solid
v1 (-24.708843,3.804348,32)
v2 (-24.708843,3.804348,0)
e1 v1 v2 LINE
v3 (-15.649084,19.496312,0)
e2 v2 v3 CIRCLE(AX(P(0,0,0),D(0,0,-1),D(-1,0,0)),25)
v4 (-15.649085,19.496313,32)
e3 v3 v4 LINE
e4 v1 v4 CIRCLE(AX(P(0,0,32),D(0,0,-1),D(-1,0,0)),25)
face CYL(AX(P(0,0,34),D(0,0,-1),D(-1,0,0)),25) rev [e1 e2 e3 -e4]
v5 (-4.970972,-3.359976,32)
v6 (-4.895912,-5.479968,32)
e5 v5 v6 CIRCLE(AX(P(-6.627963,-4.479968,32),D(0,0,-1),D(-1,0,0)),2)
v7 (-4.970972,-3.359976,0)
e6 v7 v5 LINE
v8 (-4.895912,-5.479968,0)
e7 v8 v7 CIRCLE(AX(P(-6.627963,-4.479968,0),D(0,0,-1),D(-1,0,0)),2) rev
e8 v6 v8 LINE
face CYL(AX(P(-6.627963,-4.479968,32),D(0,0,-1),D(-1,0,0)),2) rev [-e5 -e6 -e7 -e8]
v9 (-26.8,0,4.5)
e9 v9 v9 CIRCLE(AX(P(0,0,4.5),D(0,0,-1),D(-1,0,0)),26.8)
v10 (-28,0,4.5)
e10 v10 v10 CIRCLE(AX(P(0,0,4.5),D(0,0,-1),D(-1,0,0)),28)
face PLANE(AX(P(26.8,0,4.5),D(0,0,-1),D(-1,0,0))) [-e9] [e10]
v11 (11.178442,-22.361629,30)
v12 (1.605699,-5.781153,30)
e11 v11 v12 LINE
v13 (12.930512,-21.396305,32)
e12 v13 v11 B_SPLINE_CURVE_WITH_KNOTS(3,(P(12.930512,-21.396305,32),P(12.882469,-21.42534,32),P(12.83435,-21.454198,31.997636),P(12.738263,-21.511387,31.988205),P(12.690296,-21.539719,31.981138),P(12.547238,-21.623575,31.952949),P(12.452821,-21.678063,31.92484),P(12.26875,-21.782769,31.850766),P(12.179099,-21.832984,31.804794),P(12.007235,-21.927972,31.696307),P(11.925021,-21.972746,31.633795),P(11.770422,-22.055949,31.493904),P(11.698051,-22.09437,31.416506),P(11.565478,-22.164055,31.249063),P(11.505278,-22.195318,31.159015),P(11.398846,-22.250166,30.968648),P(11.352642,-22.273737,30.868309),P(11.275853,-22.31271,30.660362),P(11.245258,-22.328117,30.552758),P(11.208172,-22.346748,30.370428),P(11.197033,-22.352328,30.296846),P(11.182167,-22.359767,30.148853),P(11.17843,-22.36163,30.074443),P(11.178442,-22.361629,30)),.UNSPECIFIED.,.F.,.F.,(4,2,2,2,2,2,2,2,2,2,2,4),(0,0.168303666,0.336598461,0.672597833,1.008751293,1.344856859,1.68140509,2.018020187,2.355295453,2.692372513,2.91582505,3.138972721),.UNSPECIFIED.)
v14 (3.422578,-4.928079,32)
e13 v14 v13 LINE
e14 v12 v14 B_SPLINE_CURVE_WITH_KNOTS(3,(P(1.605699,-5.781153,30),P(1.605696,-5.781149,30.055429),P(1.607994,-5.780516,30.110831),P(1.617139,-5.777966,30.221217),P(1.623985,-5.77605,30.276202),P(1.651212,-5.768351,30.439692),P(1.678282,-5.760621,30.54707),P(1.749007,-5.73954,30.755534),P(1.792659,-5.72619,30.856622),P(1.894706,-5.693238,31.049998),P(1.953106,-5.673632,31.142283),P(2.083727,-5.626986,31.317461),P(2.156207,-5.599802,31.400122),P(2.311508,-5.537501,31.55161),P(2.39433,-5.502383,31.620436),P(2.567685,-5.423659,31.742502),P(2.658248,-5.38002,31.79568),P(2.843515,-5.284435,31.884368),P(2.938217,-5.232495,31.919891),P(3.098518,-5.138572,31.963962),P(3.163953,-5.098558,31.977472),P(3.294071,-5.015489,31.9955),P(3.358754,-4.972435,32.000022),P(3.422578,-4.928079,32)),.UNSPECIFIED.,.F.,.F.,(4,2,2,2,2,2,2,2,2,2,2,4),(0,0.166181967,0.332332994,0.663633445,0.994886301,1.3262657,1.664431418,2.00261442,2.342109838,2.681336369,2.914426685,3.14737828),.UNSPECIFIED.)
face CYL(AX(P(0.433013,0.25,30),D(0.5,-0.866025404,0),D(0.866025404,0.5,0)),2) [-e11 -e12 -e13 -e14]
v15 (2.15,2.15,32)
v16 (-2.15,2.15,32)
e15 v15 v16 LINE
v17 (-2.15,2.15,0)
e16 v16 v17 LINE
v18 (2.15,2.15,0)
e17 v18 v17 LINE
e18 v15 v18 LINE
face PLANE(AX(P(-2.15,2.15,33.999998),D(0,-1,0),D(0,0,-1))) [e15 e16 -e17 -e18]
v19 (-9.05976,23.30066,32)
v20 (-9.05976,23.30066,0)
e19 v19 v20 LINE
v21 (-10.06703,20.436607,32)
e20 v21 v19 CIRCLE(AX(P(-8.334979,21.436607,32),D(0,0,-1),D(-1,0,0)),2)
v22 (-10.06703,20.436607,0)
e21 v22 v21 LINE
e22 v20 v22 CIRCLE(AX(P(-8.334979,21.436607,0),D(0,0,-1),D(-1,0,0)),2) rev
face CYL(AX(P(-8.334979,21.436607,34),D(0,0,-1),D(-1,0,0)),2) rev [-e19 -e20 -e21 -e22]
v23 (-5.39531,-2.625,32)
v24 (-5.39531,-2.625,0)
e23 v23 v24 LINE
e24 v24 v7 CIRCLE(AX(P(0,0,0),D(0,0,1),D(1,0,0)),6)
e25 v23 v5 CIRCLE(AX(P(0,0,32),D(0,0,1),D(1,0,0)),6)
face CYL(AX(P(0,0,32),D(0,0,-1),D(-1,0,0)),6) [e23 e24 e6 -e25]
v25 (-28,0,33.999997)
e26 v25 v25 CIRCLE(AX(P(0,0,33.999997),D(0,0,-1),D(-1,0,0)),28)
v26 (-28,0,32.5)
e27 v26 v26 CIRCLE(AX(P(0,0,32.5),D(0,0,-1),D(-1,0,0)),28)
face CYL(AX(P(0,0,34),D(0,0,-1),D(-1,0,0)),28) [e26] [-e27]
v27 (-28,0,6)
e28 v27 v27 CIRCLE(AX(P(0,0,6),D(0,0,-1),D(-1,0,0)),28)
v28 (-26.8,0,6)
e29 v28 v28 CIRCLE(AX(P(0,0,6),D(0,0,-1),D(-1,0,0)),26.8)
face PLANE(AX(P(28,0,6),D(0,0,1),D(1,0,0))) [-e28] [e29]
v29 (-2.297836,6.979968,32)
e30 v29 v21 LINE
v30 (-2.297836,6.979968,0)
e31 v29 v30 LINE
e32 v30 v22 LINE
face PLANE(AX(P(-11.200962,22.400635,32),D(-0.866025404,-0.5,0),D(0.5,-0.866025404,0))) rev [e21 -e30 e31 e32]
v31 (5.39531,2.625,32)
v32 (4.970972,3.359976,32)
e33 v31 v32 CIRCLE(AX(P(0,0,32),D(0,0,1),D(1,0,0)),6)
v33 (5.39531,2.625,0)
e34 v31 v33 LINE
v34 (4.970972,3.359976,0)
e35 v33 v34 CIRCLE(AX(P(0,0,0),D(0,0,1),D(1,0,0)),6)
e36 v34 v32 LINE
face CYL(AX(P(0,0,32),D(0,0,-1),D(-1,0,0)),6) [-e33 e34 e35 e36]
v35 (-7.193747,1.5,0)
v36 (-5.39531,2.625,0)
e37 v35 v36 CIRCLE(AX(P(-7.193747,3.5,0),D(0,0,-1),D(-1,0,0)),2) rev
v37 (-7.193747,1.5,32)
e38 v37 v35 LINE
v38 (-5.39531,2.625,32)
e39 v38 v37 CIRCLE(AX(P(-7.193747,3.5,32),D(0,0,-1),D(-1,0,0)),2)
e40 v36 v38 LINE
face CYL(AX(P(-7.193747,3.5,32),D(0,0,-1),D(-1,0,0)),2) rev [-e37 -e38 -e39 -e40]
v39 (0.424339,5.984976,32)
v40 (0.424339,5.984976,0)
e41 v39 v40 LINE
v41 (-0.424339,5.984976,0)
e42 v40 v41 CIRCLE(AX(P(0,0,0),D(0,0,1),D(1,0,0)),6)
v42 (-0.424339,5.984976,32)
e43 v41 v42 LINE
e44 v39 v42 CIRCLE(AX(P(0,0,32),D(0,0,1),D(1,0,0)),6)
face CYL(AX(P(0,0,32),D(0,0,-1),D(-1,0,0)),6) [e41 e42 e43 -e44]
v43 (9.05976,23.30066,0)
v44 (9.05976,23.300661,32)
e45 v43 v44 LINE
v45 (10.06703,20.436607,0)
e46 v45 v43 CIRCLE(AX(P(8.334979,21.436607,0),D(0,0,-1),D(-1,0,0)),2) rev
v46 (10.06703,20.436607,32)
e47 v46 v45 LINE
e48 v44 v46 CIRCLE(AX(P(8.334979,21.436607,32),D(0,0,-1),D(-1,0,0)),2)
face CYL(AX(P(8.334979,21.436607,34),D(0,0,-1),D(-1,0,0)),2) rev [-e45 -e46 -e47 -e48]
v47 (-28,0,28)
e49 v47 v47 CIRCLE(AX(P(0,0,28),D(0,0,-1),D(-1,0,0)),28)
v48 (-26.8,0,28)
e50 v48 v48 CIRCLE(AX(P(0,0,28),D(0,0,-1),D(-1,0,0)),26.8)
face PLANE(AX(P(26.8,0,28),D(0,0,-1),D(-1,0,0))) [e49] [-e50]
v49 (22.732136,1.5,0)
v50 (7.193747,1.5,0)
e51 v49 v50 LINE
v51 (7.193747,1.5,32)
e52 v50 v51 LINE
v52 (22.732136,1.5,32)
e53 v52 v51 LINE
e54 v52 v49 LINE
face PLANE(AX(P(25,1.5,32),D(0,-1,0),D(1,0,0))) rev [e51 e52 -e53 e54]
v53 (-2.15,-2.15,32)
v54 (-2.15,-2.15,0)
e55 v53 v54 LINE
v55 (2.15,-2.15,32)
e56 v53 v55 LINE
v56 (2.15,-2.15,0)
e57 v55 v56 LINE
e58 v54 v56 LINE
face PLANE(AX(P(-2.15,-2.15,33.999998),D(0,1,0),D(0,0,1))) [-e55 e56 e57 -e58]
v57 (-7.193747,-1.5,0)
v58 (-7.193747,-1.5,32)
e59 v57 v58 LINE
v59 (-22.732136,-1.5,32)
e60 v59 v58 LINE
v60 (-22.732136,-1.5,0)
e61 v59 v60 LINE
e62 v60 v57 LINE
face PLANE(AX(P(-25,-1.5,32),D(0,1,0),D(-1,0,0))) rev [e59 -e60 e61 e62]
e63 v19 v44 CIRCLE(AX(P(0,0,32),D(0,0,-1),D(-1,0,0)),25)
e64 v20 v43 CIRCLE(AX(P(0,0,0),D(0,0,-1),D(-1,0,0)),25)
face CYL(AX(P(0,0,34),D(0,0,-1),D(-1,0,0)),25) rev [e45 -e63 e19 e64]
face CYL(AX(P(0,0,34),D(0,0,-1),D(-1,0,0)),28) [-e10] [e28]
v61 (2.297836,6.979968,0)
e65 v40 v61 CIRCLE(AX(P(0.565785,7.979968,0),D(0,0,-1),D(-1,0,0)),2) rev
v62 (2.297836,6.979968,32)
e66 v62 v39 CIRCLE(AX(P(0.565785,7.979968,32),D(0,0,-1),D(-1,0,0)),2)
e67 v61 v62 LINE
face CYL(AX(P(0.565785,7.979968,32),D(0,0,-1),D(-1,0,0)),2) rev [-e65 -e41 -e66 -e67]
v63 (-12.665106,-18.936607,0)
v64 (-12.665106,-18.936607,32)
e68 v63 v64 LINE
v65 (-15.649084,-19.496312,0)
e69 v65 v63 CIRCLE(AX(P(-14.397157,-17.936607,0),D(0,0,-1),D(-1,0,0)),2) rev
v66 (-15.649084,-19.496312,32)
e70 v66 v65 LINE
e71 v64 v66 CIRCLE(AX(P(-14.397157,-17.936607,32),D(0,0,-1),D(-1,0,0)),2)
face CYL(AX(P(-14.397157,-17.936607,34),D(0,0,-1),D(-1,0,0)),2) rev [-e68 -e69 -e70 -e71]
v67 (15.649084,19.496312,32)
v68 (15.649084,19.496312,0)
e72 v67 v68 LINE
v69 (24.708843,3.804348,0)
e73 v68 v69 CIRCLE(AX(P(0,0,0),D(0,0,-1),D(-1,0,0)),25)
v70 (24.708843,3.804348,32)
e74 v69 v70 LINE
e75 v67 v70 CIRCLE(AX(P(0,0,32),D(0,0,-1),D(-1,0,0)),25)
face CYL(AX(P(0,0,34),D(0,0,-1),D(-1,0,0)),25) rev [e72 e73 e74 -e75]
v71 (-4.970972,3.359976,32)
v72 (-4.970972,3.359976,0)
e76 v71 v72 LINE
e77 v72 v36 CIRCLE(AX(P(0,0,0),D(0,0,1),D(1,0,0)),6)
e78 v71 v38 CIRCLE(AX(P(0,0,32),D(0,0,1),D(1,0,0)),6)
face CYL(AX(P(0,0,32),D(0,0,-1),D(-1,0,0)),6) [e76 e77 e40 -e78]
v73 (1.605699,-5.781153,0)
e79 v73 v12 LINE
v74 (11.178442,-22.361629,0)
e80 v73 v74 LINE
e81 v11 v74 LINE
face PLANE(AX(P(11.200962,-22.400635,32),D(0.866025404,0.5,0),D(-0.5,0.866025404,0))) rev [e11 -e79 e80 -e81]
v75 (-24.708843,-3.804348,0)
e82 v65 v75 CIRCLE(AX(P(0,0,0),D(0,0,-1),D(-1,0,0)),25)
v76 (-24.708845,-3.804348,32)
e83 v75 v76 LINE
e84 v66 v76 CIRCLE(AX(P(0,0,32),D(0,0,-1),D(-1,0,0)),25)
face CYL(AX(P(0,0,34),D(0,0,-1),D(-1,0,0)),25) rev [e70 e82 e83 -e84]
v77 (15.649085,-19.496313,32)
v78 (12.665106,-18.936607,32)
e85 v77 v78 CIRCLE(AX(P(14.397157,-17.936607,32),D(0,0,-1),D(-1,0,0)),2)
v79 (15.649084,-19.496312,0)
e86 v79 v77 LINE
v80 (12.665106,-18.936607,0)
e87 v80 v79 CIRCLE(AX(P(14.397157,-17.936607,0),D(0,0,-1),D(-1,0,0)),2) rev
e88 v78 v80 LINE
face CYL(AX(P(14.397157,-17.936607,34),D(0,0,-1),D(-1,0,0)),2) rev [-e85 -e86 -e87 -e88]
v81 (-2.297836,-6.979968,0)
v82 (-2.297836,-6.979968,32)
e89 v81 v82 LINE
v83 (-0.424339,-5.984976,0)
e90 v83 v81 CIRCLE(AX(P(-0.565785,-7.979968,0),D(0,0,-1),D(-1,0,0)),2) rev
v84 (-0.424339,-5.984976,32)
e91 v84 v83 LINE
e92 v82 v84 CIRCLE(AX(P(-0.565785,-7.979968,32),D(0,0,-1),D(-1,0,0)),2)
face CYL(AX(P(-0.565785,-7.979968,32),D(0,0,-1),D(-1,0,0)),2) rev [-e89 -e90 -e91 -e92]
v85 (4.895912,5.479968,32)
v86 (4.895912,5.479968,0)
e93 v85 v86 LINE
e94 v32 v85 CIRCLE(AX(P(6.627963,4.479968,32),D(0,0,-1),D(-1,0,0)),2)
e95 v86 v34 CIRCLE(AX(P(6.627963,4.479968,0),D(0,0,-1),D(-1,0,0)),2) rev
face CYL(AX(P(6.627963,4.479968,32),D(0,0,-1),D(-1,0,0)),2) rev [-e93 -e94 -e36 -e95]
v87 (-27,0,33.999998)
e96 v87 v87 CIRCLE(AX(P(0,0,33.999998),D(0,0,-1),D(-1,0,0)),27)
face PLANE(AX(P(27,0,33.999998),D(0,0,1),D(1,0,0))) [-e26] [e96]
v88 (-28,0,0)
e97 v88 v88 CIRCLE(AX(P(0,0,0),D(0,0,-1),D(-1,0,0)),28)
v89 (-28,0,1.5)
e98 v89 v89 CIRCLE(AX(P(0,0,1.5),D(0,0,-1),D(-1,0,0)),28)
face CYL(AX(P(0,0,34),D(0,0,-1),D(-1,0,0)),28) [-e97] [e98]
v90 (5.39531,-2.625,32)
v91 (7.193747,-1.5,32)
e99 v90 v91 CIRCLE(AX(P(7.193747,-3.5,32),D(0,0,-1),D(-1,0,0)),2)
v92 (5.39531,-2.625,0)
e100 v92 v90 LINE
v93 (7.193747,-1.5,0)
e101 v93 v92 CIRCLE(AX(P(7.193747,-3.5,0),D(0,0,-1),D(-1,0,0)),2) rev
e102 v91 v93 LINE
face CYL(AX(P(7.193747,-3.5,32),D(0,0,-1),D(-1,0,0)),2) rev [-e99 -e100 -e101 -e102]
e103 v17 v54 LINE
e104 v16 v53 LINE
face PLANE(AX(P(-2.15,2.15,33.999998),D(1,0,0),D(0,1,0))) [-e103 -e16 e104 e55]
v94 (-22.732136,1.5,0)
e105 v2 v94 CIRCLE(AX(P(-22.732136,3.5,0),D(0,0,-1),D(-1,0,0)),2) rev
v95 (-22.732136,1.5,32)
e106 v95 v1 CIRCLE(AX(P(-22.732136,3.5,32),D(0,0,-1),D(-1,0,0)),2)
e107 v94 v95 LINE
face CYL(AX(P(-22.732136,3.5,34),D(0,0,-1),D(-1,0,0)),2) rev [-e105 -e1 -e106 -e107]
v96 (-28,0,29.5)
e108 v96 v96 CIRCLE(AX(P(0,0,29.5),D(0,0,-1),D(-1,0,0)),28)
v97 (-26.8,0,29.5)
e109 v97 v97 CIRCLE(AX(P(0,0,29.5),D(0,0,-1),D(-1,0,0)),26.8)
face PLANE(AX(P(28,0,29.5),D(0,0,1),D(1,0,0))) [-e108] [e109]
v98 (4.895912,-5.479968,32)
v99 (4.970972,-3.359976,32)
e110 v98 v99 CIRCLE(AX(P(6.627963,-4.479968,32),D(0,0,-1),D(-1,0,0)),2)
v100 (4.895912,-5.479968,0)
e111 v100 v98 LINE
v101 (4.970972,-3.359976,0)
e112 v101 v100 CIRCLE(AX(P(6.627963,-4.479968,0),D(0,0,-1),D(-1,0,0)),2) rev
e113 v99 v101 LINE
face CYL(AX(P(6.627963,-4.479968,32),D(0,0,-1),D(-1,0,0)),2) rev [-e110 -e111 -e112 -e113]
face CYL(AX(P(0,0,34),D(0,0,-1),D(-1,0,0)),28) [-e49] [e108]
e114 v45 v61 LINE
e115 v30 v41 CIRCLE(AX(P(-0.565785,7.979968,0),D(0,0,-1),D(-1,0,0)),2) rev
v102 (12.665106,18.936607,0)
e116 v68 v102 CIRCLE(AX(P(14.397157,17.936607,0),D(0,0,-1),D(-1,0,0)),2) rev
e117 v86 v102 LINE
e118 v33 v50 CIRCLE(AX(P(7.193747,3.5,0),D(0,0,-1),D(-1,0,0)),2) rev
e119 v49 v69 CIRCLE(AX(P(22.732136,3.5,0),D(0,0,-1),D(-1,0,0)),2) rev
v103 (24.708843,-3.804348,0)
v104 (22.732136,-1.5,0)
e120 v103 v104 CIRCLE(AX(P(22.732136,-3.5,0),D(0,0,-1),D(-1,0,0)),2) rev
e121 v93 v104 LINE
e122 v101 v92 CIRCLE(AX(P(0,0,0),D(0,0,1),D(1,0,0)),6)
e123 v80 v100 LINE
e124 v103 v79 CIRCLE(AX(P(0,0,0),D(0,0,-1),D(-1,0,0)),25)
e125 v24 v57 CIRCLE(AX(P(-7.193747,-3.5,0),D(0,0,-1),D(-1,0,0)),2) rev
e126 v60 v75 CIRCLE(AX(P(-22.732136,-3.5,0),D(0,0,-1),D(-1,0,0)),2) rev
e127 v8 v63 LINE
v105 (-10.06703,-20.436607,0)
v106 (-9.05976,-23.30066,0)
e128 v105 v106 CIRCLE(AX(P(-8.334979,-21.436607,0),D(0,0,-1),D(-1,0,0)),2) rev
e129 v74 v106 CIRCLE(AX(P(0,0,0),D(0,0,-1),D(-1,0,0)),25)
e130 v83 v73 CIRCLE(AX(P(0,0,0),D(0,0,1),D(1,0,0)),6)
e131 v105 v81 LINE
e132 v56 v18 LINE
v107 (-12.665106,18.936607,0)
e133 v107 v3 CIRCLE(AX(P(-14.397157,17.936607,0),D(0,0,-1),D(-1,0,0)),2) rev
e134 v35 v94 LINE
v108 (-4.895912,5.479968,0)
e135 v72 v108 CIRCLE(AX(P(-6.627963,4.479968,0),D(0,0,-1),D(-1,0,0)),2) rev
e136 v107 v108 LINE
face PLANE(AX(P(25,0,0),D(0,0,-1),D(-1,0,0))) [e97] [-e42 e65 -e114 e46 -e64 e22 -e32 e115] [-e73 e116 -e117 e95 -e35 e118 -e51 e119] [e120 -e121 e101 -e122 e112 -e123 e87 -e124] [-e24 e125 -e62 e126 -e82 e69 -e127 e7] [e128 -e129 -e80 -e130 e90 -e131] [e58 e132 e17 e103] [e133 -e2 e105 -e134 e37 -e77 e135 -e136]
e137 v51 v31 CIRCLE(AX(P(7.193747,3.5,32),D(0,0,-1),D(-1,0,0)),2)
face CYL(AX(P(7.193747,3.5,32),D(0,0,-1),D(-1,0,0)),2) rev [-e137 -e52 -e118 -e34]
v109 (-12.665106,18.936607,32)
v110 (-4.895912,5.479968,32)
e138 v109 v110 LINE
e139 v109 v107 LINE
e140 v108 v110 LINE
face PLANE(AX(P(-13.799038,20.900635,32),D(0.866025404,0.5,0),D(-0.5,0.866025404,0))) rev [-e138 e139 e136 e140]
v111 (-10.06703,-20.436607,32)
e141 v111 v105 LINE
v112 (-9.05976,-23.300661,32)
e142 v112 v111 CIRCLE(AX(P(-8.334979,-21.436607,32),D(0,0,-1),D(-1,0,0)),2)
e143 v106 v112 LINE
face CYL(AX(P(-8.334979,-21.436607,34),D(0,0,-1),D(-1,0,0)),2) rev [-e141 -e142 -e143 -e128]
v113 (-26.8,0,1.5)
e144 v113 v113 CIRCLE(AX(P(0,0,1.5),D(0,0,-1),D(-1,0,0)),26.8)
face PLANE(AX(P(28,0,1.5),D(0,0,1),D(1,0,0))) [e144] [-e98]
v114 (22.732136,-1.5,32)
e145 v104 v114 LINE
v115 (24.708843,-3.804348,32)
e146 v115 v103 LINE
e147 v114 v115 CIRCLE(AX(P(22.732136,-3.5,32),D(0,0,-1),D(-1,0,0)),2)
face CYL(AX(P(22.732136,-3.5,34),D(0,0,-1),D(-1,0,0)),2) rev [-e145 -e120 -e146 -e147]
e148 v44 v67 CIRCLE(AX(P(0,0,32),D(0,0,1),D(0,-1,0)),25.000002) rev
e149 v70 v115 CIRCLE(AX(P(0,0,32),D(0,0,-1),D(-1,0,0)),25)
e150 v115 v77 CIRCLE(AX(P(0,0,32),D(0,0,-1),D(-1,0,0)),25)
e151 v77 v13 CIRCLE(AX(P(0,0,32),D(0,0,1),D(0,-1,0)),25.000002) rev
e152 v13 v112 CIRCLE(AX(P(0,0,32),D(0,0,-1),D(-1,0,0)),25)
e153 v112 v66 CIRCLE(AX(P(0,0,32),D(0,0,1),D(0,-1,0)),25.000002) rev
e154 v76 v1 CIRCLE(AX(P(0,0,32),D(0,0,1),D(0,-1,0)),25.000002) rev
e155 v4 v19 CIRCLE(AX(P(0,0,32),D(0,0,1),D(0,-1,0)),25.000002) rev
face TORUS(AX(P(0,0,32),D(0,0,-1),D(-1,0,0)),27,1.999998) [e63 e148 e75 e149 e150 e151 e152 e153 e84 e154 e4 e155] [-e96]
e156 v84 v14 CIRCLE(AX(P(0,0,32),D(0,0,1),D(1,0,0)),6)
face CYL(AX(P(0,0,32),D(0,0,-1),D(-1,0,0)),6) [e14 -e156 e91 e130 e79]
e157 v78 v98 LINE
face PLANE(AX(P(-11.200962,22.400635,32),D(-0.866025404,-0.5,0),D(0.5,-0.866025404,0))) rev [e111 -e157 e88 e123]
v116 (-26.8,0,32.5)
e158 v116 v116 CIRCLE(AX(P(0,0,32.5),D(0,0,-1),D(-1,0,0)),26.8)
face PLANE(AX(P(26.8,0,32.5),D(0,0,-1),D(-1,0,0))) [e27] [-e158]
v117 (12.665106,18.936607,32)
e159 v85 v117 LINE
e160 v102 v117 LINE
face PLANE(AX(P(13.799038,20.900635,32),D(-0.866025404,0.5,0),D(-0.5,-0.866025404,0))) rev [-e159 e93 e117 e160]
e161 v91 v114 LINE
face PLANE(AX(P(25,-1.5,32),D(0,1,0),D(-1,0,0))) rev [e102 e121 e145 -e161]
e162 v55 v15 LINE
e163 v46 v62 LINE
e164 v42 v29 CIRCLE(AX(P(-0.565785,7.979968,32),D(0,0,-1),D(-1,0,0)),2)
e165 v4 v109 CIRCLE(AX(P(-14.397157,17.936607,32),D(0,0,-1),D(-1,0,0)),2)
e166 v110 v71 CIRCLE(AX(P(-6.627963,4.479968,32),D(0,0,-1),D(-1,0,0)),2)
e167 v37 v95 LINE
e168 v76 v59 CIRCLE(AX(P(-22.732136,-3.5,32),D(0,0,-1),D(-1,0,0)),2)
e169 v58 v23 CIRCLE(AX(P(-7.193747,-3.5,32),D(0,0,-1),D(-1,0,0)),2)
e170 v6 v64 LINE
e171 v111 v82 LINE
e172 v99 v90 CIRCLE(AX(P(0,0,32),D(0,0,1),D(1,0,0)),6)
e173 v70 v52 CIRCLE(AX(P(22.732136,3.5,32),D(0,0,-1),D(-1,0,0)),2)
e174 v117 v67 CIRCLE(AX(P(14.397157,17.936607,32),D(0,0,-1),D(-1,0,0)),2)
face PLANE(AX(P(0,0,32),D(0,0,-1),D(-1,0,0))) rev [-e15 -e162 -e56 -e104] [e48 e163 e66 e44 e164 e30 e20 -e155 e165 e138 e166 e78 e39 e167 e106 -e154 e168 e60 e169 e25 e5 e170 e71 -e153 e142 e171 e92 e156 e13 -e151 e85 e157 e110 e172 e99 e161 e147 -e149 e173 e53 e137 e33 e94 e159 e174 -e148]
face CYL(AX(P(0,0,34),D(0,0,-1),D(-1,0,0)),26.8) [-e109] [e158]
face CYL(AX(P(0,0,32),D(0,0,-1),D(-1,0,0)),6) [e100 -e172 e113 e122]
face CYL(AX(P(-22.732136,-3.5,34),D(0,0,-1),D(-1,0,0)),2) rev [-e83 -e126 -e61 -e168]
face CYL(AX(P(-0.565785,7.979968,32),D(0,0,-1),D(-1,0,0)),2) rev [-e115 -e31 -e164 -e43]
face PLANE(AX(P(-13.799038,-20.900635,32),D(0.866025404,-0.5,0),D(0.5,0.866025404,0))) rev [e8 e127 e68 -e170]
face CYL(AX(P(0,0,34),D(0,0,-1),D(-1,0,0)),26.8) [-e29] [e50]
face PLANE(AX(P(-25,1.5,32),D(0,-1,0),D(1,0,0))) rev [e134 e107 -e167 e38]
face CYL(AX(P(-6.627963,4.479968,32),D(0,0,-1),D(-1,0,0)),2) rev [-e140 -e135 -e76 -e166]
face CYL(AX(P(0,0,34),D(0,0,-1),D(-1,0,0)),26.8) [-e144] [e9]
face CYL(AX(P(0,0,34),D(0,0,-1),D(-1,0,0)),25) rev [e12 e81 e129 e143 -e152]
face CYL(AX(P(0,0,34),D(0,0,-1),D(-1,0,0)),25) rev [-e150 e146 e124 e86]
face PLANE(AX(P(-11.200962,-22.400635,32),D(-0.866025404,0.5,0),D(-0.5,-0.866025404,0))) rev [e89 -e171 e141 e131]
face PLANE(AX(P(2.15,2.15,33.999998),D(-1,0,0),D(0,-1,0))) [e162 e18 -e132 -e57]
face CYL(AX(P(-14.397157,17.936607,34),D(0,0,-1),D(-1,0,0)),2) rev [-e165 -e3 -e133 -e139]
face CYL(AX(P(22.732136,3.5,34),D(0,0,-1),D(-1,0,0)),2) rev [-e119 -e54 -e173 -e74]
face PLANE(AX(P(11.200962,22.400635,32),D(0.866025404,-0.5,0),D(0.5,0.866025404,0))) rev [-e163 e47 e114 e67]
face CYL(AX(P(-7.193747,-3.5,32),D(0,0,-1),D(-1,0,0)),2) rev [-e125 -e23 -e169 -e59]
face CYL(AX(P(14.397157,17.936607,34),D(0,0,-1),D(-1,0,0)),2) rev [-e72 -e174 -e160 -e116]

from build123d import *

# Parameters (mm, degrees)
SKETCH2_W           = 25
SKETCH2_H           = 3
BOSS_EXTRUDE1_DEPTH = 32
CIRPATTERN1_COUNT   = 6
SKETCH5_R           = 6
BOSS_EXTRUDE2_DEPTH = 32
SKETCH6_W           = 4.3
SKETCH6_H           = 4.3
AXLEHOLE_DEPTH      = 53.191951405
FILLET1_R           = 2


with BuildPart() as part:
    # Sketch1 → Revolve1 (revolve)
    with BuildSketch(Plane.XZ, mode=Mode.PRIVATE) as revolve1_sk:
        with BuildLine():
            Line((25, 0), (28, 0))
            Line((28, 0), (28, 1.5))
            Line((28, 1.5), (26.8, 1.5))
            Line((26.8, 1.5), (26.8, 4.5))
            Line((26.8, 4.5), (28, 4.5))
            Line((28, 4.5), (28, 6))
            Line((28, 6), (26.8, 6))
            Line((26.8, 6), (26.8, 28))
            Line((26.8, 28), (28, 28))
            Line((28, 28), (28, 29.5))
            Line((28, 29.5), (26.8, 29.5))
            Line((26.8, 29.5), (26.8, 32.5))
            Line((26.8, 32.5), (28, 32.5))
            Line((28, 32.5), (28, 33.999996833))
            Line((28, 33.999996833), (27, 33.999996833))
            ThreePointArc((27, 33.999996833), (25.585786438, 33.414213562), (25, 32))
            Line((25, 32), (25, 0))
        make_face()
    revolve(revolve1_sk.sketch.rotate(Axis((0, 0, 34), (0, 0, -1)), 180), axis=Axis((0, 0, 34), (0, 0, -1)))

    # Sketch2 → Boss-Extrude1 (add)
    with BuildSketch(Plane.XY):
        with Locations((12.5, 0)):
            Rectangle(SKETCH2_W, SKETCH2_H)
    boss_extrude1 = extrude(amount=BOSS_EXTRUDE1_DEPTH)

    # CirPattern1: Boss-Extrude1 ×6 about axis
    cirpattern1_axis = Axis((0, 0, 0), (0, 0, 1))
    for i in range(1, CIRPATTERN1_COUNT):
        add(boss_extrude1.rotate(cirpattern1_axis, i * 360 / CIRPATTERN1_COUNT))

    # Sketch5 → Boss-Extrude2 (add)
    with BuildSketch(Plane.XY):
        Circle(SKETCH5_R)
    extrude(amount=BOSS_EXTRUDE2_DEPTH)

    # Sketch6 → AxleHole (cut, through all)
    with BuildSketch(Plane.XY):
        Rectangle(SKETCH6_W, SKETCH6_H)
    extrude(amount=AXLEHOLE_DEPTH, mode=Mode.SUBTRACT)

    # Fillet1
    # the kernel refuses this fillet: 2 mm, written as the material it adds along each edge
    with BuildSketch(Plane(origin=(-24.954959427, -1.5, 32), x_dir=(0.10620109039764976, -0.9943446728365121, 0), z_dir=(0, 0, -1))) as fillet1_piece_1:
        with BuildLine():
            CenterArc((2.224755634, -1.997850608), FILLET1_R, 87.343441845, 98.752929077)
            Line((0.236066288, -2.210252789), (0, 0))
            ThreePointArc((0, 0), (1.158726893, 0.026867397), (2.317453785, 0))
        make_face()
    extrude(amount=32)
    with BuildSketch(Plane(origin=(-13.776517819, -20.861628814, 32), x_dir=(-0.8080272015953212, 0.589145178612228, 0), z_dir=(0, 0, -1)), Plane(origin=(13.776517819, 20.861628814, 32), x_dir=(0.8080272015953204, -0.589145178612229, 0), z_dir=(0, 0, -1)), Plane(origin=(24.954959427, -1.5, 32), x_dir=(-0.10620109039765001, -0.994344672836512, 0), z_dir=(0, 0, -1)), Plane(origin=(-11.178441608, 22.361628814, 32), x_dir=(0.9142282919929712, 0.405199494224283, 0), z_dir=(0, 0, -1)), Plane(origin=(-24.954959427, 1.5, 32), x_dir=(0.10620109039765026, 0.994344672836512, 0), z_dir=(0, 0, -1))) as fillet1_piece_2:
        with BuildLine():
            CenterArc((2.224755634, 1.997850608), FILLET1_R, 173.903629078, 98.752929077)
            Line((0.236066288, 2.210252789), (0, 0))
            ThreePointArc((0, 0), (1.158726893, -0.026867397), (2.317453785, 0))
        make_face()
    extrude(amount=32)
    with BuildSketch(Plane(origin=(-11.178441608, -22.361628814, 32), x_dir=(0.4999999999999988, 0.8660254037844393, 0), z_dir=(0, 0, -1)), Plane(origin=(13.776517819, -20.861628814, 32), x_dir=(-0.500000000000002, 0.8660254037844375, 0), z_dir=(0, 0, -1)), Plane(origin=(24.954959427, 1.5, 32), x_dir=(-1, 0, 0), z_dir=(0, 0, -1)), Plane(origin=(11.178441608, 22.361628814, 32), x_dir=(-0.5000000000000002, -0.8660254037844387, 0), z_dir=(0, 0, -1)), Plane(origin=(-13.776517819, 20.861628814, 32), x_dir=(0.5000000000000002, -0.8660254037844387, 0), z_dir=(0, 0, -1))) as fillet1_piece_3:
        with BuildLine():
            CenterArc((2.222823584, 2), FILLET1_R, 171.247070923, 98.752929077)
            ThreePointArc((0.246116119, 2.304347826), (0.096342606, 1.15502726), (0, 0))
            Line((0, 0), (2.222823584, 0))
        make_face()
    extrude(amount=32)
    with BuildSketch(Plane(origin=(5.809475019, 1.5, 32), x_dir=(1, 0, 0), z_dir=(0, 0, -1)), Plane(origin=(4.203775615, -4.281152949, 32), x_dir=(0.5000000000000001, -0.8660254037844386, 0), z_dir=(0, 0, -1)), Plane(origin=(1.605699404, 5.781152949, 32), x_dir=(0.4999999999999986, 0.8660254037844394, 0), z_dir=(0, 0, -1)), Plane(origin=(-4.203775615, 4.281152949, 32), x_dir=(-0.5000000000000004, 0.8660254037844384, 0), z_dir=(0, 0, -1)), Plane(origin=(-5.809475019, -1.5, 32), x_dir=(-1, 0, 0), z_dir=(0, 0, -1)), Plane(origin=(-1.605699404, -5.781152949, 32), x_dir=(-0.4999999999999988, -0.8660254037844393, 0), z_dir=(0, 0, -1))) as fillet1_piece_4:
        with BuildLine():
            CenterArc((1.384272266, -2), FILLET1_R, 90, 64.055520228)
            ThreePointArc((-0.414164556, -1.125), (-0.178914596, -0.572869827), (0, 0))
            Line((0, 0), (1.384272266, 0))
        make_face()
    extrude(amount=32)
    with BuildSketch(Plane(origin=(4.203775615, 4.281152949, 32), x_dir=(0.6399622417657335, -0.7684063567632539, 0), z_dir=(0, 0, -1)), Plane(origin=(5.809475019, -1.5, 32), x_dir=(-0.3454783045035584, -0.9384267372135913, 0), z_dir=(0, 0, -1)), Plane(origin=(-1.605699404, 5.781152949, 32), x_dir=(0.9854405462692932, 0.1700203804503366, 0), z_dir=(0, 0, -1)), Plane(origin=(-5.809475019, 1.5, 32), x_dir=(0.3454783045035597, 0.9384267372135907, 0), z_dir=(0, 0, -1))) as fillet1_piece_5:
        with BuildLine():
            CenterArc((1.398617439, -1.989994715), FILLET1_R, 95.733483793, 64.055520228)
            Line((-0.478236035, -1.299038106), (0, 0))
            ThreePointArc((0, 0), (0.599407474, -0.030015856), (1.198814948, 0))
        make_face()
    extrude(amount=32)
    with BuildSketch(Plane(origin=(-4.203775615, -4.281152949, 32), x_dir=(-0.4999999999999996, -0.8660254037844388, 0), z_dir=(0, 0, -1))) as fillet1_piece_6:
        with BuildLine():
            CenterArc((1.384272266, 2), FILLET1_R, 205.944479772, 64.055520228)
            ThreePointArc((-0.414164556, 1.125), (-0.178914596, 0.572869827), (0, 0))
            Line((0, 0), (1.384272266, 0))
        make_face()
    extrude(amount=32)
    # the kernel refuses this fillet: 2 mm, written as the material it takes off along each edge
    with BuildSketch(Plane(origin=(-0.894300596, -1.45102593, 32), x_dir=(0.8660254037844386, 0.5000000000000003, 0), z_dir=(0.5000000000000003, -0.8660254037844386, 0))) as fillet1_2_piece_1_section:
        with BuildLine():
            CenterArc((FILLET1_R, -FILLET1_R), FILLET1_R, 90, 90)
            Line((0, -FILLET1_R), (0, 0))
            Line((0, 0), (FILLET1_R, 0))
        make_face()
    fillet1_2_piece_1 = extrude(amount=29.145484408, mode=Mode.PRIVATE)
    fillet1_2_piece_1 = fillet1_2_piece_1 & Plane(origin=(0, 0, 32), x_dir=(-1, 0, 0), z_dir=(0, 0, -1)) * Cylinder(25, 67, mode=Mode.PRIVATE)
    fillet1_2_piece_1 = fillet1_2_piece_1 - Plane(origin=(0, 0, 32), x_dir=(1, 0, 0), z_dir=(0, 0, -1)) * Cylinder(6, 67, mode=Mode.PRIVATE)
    add(fillet1_2_piece_1, mode=Mode.SUBTRACT)


solid = part.part
